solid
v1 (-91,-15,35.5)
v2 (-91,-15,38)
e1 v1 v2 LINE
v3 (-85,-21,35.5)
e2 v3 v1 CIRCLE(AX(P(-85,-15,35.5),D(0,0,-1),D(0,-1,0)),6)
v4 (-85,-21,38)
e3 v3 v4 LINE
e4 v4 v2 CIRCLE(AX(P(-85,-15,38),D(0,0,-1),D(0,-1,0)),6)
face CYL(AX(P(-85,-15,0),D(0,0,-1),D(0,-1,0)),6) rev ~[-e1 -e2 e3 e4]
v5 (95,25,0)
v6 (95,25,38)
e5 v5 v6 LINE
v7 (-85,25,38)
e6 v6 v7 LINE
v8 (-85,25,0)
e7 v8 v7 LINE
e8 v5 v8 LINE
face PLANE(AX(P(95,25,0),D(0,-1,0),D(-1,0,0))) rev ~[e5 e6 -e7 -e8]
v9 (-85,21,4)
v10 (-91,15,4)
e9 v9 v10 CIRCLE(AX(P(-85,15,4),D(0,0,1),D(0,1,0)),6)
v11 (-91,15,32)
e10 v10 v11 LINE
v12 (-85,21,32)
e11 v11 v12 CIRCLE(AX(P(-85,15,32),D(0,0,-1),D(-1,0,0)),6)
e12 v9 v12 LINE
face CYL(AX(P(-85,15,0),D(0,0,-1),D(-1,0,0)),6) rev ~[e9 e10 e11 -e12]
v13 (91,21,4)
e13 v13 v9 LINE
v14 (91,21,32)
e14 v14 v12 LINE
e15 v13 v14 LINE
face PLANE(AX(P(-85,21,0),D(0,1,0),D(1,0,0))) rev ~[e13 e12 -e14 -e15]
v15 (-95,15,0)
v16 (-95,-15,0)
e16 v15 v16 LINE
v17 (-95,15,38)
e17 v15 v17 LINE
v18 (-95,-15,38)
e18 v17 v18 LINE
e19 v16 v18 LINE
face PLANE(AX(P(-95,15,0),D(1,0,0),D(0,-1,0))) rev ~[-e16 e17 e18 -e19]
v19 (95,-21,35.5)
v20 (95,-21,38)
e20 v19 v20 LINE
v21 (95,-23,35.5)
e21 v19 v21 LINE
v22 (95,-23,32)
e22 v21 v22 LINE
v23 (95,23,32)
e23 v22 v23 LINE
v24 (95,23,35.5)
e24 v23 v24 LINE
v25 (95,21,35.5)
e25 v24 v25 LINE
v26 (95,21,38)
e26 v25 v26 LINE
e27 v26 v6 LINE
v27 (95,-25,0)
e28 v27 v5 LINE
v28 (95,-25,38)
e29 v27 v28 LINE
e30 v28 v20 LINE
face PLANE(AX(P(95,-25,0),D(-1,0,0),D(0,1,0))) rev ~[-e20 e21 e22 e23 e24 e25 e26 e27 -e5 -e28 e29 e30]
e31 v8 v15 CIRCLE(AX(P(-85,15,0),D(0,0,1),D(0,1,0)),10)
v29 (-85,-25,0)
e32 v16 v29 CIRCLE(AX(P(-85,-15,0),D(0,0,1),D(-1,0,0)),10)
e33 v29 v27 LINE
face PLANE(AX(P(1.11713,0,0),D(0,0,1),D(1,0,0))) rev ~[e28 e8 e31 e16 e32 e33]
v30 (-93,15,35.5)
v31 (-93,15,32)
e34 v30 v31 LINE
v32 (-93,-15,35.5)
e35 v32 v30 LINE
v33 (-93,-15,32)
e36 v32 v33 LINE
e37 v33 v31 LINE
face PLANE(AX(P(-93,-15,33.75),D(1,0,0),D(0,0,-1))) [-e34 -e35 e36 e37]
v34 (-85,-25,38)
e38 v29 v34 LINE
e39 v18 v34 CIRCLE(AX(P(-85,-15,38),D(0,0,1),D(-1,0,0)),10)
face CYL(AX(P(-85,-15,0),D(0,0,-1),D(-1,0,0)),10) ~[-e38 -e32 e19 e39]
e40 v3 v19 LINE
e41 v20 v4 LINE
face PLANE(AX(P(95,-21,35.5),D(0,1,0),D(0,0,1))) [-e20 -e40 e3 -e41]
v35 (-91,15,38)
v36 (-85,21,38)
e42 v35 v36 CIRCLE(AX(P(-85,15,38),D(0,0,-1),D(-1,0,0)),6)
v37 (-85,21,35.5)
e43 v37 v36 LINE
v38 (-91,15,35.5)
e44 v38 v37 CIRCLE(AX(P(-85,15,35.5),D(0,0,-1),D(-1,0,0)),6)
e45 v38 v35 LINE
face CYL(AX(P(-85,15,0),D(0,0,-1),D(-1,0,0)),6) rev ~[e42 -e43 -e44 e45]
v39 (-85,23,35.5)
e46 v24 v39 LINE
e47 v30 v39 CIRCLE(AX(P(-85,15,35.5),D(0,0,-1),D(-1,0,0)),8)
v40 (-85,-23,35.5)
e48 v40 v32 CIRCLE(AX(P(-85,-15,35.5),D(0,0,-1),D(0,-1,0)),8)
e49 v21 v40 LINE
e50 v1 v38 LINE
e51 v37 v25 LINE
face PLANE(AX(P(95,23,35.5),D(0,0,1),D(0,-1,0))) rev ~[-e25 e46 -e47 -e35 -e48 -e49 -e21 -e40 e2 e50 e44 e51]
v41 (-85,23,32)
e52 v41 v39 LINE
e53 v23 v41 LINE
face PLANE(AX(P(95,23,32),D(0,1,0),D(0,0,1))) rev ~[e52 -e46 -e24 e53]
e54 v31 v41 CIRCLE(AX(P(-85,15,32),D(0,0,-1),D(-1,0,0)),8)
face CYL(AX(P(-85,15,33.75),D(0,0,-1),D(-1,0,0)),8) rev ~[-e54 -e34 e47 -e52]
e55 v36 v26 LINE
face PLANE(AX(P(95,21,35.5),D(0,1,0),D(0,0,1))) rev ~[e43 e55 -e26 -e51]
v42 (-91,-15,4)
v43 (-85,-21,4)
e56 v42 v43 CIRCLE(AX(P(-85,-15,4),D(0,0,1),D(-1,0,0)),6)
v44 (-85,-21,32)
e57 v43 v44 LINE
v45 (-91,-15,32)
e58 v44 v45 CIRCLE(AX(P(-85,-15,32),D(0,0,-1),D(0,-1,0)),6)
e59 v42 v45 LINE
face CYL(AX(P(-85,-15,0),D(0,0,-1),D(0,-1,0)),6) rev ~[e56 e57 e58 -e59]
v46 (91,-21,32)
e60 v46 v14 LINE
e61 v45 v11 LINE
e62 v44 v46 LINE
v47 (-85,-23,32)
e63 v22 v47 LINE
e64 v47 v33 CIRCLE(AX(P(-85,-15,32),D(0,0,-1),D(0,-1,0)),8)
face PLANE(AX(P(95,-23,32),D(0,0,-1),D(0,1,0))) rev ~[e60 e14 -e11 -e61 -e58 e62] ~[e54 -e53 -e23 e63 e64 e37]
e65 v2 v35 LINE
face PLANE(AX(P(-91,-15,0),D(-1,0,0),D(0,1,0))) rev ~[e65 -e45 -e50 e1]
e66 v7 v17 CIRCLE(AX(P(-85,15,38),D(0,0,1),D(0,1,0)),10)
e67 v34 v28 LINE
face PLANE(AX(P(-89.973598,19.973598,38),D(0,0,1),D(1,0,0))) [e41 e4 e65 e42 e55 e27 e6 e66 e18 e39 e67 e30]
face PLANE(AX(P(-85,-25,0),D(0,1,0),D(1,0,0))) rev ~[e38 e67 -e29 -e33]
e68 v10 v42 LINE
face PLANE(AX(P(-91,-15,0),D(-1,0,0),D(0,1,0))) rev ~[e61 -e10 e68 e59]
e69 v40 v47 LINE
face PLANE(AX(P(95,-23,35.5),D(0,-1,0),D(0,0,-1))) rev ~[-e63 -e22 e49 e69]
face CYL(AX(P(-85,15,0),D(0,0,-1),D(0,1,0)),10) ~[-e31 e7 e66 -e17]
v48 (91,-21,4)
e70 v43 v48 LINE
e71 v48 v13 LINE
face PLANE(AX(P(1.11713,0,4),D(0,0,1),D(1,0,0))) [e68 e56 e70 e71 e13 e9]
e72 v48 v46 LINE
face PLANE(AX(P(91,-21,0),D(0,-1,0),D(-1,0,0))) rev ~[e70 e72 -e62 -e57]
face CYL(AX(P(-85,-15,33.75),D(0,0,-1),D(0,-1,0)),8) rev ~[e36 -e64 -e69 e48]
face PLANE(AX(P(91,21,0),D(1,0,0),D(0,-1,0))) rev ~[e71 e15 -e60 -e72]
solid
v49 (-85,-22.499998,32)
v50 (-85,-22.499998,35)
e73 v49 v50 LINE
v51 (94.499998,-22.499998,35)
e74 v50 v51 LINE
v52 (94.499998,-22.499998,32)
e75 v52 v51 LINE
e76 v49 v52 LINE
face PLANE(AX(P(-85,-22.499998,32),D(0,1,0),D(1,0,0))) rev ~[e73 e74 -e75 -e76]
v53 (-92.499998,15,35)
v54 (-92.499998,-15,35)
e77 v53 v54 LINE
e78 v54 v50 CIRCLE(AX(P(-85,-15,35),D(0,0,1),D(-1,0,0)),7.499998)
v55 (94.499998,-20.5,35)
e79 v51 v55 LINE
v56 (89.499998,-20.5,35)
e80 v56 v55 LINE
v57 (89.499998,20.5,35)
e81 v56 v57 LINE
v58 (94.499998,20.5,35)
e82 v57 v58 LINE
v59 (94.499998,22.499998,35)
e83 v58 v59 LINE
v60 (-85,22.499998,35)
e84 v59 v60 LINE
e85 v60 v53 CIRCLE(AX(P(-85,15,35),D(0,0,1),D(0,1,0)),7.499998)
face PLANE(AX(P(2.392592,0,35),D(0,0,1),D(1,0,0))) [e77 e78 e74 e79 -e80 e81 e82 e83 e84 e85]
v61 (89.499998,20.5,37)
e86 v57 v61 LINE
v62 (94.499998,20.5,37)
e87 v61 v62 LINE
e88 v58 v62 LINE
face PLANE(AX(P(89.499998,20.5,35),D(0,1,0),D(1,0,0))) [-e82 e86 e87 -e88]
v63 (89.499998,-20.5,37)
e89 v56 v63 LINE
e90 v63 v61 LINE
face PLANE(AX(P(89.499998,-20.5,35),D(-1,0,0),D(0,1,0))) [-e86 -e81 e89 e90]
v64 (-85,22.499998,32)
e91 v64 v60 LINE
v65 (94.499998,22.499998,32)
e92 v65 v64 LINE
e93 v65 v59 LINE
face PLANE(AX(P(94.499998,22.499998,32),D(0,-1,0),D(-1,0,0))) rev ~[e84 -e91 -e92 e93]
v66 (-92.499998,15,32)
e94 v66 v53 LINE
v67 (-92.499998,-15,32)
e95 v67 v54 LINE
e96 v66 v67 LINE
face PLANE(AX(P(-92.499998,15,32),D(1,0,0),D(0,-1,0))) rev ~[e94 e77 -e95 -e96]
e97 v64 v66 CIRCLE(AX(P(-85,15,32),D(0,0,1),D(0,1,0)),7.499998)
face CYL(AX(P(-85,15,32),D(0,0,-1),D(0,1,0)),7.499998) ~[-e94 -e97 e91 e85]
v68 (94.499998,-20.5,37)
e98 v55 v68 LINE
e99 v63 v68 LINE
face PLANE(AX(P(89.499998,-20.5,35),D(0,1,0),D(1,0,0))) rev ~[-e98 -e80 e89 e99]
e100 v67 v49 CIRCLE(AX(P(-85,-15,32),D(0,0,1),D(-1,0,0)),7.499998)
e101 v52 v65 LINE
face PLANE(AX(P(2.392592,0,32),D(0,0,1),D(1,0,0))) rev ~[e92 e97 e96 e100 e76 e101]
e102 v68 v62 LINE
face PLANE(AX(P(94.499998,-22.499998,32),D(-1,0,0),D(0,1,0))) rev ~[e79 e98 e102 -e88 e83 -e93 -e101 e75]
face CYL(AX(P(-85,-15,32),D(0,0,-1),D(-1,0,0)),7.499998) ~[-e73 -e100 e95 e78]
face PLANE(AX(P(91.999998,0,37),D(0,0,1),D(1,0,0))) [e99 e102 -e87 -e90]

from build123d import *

# Parameters (mm, degrees)
F1_DEPTH  = 38
F2_DEPTH  = 4
F3_W      = 42
F3_H      = 2.5
F4_DEPTH  = 180
F5_W      = 2
F5_H      = 3.5
F8_DEPTH  = 3
F9_W      = 5
F9_H      = 41
F10_DEPTH = 2


# Not quite as in the source:
# - a feature names something its author has since deleted; it is built from what else it names


with BuildPart() as f1:
    # F0 (on Top) → F1 (new body)
    with BuildSketch(Plane.XY):
        with BuildLine():
            ThreePointArc((-91, 15), (-89.2426406871, 19.2426406871), (-85, 21))
            Line((-85, 21), (-85, 25))
            ThreePointArc((-85, 25), (-92.0710678119, 22.0710678119), (-95, 15))
            Line((-95, 15), (-91, 15))
        make_face()
        with BuildLine():
            Line((91, 21), (91, -21))
            Line((91, -21), (-85, -21))
            ThreePointArc((-85, -21), (-89.2426406871, -19.2426406871), (-91, -15))
            Line((-91, -15), (-91, 15))
            Line((-91, 15), (-95, 15))
            Line((-95, 15), (-95, -15))
            ThreePointArc((-95, -15), (-92.0710678119, -22.0710678119), (-85, -25))
            Line((-85, -25), (95, -25))
            Line((95, -25), (95, 25))
            Line((95, 25), (-85, 25))
            Line((-85, 25), (-85, 21))
            Line((-85, 21), (91, 21))
        make_face()
    extrude(amount=F1_DEPTH)

    # F0 (on Top) → F2 (join)
    with BuildSketch(Plane.XY):
        with BuildLine():
            Line((-85, -21), (91, -21))
            Line((91, -21), (91, 21))
            Line((91, 21), (-85, 21))
            ThreePointArc((-85, 21), (-89.2426406871, 19.2426406871), (-91, 15))
            Line((-91, 15), (-91, -15))
            ThreePointArc((-91, -15), (-89.2426406871, -19.2426406871), (-85, -21))
        make_face()
    extrude(amount=F2_DEPTH)

    # F3 (on face) → F4 (cut, through all)
    with BuildSketch(Plane.YZ.offset(95)):
        with Locations((0, 36.75)):
            Rectangle(F3_W, F3_H)
        Polygon((21, 35.5), (-21, 35.5), (-23, 35.5), (-23, 32), (-21, 32), (21, 32), (23, 32), (23, 35.5), align=None)
    extrude(amount=-F4_DEPTH, mode=Mode.SUBTRACT)

    # F6: sweep along a path in F6_path
    with BuildLine(Plane(origin=(-91, -15, 38), x_dir=(0, -1, 0), z_dir=(0, 0, -1))) as f6_path:
        ThreePointArc((6, -6), (4.2426406871, -1.7573593129), (0, 0))
        Line((0, 0), (-30, 0))
        ThreePointArc((-30, 0), (-34.2426406871, -1.7573593129), (-36, -6))
    # F5 (on face) → F6 (sweep, cut)
    with BuildSketch(Plane.YZ.offset(-85)):
        with Locations((-22, 33.75)):
            Rectangle(F5_W, F5_H)
    sweep(path=f6_path.line, mode=Mode.SUBTRACT)


with BuildPart() as f8:
    # F7 (on face) → F8 (new body)
    with BuildSketch(Plane.XY.offset(32)):
        with BuildLine():
            Line((94.4999977946, 22.4999977946), (-85, 22.4999977946))
            ThreePointArc((-85, 22.4999977946), (-90.3032992995, 20.3032992995), (-92.4999977946, 15))
            Line((-92.4999977946, 15), (-92.4999977946, -15))
            ThreePointArc((-92.4999977946, -15), (-90.3032992995, -20.3032992995), (-85, -22.4999977946))
            Line((-85, -22.4999977946), (94.4999977946, -22.4999977946))
            Line((94.4999977946, -22.4999977946), (94.4999977946, 22.4999977946))
        make_face()
        with BuildLine():
            ThreePointArc((-91, 15), (-89.2426406871, 19.2426406871), (-85, 21))
            Line((-85, 21), (91, 21))
            Line((91, 21), (91, -21))
            Line((91, -21), (-85, -21))
            ThreePointArc((-85, -21), (-89.2426406871, -19.2426406871), (-91, -15))
            Line((-91, -15), (-91, 15))
        make_face(mode=Mode.SUBTRACT)
        with BuildLine():
            Line((91, 21), (-85, 21))
            ThreePointArc((-85, 21), (-89.2426406871, 19.2426406871), (-91, 15))
            Line((-91, 15), (-91, -15))
            ThreePointArc((-91, -15), (-89.2426406871, -19.2426406871), (-85, -21))
            Line((-85, -21), (91, -21))
            Line((91, -21), (91, 21))
        make_face()
    extrude(amount=F8_DEPTH)

    # F9 (on face) → F10 (join, through all)
    with BuildSketch(Plane.XY.offset(35)):
        with Locations((91.9999977946, 0)):
            Rectangle(F9_W, F9_H)
    extrude(amount=F10_DEPTH)


solid = Compound([f1.part, f8.part])
